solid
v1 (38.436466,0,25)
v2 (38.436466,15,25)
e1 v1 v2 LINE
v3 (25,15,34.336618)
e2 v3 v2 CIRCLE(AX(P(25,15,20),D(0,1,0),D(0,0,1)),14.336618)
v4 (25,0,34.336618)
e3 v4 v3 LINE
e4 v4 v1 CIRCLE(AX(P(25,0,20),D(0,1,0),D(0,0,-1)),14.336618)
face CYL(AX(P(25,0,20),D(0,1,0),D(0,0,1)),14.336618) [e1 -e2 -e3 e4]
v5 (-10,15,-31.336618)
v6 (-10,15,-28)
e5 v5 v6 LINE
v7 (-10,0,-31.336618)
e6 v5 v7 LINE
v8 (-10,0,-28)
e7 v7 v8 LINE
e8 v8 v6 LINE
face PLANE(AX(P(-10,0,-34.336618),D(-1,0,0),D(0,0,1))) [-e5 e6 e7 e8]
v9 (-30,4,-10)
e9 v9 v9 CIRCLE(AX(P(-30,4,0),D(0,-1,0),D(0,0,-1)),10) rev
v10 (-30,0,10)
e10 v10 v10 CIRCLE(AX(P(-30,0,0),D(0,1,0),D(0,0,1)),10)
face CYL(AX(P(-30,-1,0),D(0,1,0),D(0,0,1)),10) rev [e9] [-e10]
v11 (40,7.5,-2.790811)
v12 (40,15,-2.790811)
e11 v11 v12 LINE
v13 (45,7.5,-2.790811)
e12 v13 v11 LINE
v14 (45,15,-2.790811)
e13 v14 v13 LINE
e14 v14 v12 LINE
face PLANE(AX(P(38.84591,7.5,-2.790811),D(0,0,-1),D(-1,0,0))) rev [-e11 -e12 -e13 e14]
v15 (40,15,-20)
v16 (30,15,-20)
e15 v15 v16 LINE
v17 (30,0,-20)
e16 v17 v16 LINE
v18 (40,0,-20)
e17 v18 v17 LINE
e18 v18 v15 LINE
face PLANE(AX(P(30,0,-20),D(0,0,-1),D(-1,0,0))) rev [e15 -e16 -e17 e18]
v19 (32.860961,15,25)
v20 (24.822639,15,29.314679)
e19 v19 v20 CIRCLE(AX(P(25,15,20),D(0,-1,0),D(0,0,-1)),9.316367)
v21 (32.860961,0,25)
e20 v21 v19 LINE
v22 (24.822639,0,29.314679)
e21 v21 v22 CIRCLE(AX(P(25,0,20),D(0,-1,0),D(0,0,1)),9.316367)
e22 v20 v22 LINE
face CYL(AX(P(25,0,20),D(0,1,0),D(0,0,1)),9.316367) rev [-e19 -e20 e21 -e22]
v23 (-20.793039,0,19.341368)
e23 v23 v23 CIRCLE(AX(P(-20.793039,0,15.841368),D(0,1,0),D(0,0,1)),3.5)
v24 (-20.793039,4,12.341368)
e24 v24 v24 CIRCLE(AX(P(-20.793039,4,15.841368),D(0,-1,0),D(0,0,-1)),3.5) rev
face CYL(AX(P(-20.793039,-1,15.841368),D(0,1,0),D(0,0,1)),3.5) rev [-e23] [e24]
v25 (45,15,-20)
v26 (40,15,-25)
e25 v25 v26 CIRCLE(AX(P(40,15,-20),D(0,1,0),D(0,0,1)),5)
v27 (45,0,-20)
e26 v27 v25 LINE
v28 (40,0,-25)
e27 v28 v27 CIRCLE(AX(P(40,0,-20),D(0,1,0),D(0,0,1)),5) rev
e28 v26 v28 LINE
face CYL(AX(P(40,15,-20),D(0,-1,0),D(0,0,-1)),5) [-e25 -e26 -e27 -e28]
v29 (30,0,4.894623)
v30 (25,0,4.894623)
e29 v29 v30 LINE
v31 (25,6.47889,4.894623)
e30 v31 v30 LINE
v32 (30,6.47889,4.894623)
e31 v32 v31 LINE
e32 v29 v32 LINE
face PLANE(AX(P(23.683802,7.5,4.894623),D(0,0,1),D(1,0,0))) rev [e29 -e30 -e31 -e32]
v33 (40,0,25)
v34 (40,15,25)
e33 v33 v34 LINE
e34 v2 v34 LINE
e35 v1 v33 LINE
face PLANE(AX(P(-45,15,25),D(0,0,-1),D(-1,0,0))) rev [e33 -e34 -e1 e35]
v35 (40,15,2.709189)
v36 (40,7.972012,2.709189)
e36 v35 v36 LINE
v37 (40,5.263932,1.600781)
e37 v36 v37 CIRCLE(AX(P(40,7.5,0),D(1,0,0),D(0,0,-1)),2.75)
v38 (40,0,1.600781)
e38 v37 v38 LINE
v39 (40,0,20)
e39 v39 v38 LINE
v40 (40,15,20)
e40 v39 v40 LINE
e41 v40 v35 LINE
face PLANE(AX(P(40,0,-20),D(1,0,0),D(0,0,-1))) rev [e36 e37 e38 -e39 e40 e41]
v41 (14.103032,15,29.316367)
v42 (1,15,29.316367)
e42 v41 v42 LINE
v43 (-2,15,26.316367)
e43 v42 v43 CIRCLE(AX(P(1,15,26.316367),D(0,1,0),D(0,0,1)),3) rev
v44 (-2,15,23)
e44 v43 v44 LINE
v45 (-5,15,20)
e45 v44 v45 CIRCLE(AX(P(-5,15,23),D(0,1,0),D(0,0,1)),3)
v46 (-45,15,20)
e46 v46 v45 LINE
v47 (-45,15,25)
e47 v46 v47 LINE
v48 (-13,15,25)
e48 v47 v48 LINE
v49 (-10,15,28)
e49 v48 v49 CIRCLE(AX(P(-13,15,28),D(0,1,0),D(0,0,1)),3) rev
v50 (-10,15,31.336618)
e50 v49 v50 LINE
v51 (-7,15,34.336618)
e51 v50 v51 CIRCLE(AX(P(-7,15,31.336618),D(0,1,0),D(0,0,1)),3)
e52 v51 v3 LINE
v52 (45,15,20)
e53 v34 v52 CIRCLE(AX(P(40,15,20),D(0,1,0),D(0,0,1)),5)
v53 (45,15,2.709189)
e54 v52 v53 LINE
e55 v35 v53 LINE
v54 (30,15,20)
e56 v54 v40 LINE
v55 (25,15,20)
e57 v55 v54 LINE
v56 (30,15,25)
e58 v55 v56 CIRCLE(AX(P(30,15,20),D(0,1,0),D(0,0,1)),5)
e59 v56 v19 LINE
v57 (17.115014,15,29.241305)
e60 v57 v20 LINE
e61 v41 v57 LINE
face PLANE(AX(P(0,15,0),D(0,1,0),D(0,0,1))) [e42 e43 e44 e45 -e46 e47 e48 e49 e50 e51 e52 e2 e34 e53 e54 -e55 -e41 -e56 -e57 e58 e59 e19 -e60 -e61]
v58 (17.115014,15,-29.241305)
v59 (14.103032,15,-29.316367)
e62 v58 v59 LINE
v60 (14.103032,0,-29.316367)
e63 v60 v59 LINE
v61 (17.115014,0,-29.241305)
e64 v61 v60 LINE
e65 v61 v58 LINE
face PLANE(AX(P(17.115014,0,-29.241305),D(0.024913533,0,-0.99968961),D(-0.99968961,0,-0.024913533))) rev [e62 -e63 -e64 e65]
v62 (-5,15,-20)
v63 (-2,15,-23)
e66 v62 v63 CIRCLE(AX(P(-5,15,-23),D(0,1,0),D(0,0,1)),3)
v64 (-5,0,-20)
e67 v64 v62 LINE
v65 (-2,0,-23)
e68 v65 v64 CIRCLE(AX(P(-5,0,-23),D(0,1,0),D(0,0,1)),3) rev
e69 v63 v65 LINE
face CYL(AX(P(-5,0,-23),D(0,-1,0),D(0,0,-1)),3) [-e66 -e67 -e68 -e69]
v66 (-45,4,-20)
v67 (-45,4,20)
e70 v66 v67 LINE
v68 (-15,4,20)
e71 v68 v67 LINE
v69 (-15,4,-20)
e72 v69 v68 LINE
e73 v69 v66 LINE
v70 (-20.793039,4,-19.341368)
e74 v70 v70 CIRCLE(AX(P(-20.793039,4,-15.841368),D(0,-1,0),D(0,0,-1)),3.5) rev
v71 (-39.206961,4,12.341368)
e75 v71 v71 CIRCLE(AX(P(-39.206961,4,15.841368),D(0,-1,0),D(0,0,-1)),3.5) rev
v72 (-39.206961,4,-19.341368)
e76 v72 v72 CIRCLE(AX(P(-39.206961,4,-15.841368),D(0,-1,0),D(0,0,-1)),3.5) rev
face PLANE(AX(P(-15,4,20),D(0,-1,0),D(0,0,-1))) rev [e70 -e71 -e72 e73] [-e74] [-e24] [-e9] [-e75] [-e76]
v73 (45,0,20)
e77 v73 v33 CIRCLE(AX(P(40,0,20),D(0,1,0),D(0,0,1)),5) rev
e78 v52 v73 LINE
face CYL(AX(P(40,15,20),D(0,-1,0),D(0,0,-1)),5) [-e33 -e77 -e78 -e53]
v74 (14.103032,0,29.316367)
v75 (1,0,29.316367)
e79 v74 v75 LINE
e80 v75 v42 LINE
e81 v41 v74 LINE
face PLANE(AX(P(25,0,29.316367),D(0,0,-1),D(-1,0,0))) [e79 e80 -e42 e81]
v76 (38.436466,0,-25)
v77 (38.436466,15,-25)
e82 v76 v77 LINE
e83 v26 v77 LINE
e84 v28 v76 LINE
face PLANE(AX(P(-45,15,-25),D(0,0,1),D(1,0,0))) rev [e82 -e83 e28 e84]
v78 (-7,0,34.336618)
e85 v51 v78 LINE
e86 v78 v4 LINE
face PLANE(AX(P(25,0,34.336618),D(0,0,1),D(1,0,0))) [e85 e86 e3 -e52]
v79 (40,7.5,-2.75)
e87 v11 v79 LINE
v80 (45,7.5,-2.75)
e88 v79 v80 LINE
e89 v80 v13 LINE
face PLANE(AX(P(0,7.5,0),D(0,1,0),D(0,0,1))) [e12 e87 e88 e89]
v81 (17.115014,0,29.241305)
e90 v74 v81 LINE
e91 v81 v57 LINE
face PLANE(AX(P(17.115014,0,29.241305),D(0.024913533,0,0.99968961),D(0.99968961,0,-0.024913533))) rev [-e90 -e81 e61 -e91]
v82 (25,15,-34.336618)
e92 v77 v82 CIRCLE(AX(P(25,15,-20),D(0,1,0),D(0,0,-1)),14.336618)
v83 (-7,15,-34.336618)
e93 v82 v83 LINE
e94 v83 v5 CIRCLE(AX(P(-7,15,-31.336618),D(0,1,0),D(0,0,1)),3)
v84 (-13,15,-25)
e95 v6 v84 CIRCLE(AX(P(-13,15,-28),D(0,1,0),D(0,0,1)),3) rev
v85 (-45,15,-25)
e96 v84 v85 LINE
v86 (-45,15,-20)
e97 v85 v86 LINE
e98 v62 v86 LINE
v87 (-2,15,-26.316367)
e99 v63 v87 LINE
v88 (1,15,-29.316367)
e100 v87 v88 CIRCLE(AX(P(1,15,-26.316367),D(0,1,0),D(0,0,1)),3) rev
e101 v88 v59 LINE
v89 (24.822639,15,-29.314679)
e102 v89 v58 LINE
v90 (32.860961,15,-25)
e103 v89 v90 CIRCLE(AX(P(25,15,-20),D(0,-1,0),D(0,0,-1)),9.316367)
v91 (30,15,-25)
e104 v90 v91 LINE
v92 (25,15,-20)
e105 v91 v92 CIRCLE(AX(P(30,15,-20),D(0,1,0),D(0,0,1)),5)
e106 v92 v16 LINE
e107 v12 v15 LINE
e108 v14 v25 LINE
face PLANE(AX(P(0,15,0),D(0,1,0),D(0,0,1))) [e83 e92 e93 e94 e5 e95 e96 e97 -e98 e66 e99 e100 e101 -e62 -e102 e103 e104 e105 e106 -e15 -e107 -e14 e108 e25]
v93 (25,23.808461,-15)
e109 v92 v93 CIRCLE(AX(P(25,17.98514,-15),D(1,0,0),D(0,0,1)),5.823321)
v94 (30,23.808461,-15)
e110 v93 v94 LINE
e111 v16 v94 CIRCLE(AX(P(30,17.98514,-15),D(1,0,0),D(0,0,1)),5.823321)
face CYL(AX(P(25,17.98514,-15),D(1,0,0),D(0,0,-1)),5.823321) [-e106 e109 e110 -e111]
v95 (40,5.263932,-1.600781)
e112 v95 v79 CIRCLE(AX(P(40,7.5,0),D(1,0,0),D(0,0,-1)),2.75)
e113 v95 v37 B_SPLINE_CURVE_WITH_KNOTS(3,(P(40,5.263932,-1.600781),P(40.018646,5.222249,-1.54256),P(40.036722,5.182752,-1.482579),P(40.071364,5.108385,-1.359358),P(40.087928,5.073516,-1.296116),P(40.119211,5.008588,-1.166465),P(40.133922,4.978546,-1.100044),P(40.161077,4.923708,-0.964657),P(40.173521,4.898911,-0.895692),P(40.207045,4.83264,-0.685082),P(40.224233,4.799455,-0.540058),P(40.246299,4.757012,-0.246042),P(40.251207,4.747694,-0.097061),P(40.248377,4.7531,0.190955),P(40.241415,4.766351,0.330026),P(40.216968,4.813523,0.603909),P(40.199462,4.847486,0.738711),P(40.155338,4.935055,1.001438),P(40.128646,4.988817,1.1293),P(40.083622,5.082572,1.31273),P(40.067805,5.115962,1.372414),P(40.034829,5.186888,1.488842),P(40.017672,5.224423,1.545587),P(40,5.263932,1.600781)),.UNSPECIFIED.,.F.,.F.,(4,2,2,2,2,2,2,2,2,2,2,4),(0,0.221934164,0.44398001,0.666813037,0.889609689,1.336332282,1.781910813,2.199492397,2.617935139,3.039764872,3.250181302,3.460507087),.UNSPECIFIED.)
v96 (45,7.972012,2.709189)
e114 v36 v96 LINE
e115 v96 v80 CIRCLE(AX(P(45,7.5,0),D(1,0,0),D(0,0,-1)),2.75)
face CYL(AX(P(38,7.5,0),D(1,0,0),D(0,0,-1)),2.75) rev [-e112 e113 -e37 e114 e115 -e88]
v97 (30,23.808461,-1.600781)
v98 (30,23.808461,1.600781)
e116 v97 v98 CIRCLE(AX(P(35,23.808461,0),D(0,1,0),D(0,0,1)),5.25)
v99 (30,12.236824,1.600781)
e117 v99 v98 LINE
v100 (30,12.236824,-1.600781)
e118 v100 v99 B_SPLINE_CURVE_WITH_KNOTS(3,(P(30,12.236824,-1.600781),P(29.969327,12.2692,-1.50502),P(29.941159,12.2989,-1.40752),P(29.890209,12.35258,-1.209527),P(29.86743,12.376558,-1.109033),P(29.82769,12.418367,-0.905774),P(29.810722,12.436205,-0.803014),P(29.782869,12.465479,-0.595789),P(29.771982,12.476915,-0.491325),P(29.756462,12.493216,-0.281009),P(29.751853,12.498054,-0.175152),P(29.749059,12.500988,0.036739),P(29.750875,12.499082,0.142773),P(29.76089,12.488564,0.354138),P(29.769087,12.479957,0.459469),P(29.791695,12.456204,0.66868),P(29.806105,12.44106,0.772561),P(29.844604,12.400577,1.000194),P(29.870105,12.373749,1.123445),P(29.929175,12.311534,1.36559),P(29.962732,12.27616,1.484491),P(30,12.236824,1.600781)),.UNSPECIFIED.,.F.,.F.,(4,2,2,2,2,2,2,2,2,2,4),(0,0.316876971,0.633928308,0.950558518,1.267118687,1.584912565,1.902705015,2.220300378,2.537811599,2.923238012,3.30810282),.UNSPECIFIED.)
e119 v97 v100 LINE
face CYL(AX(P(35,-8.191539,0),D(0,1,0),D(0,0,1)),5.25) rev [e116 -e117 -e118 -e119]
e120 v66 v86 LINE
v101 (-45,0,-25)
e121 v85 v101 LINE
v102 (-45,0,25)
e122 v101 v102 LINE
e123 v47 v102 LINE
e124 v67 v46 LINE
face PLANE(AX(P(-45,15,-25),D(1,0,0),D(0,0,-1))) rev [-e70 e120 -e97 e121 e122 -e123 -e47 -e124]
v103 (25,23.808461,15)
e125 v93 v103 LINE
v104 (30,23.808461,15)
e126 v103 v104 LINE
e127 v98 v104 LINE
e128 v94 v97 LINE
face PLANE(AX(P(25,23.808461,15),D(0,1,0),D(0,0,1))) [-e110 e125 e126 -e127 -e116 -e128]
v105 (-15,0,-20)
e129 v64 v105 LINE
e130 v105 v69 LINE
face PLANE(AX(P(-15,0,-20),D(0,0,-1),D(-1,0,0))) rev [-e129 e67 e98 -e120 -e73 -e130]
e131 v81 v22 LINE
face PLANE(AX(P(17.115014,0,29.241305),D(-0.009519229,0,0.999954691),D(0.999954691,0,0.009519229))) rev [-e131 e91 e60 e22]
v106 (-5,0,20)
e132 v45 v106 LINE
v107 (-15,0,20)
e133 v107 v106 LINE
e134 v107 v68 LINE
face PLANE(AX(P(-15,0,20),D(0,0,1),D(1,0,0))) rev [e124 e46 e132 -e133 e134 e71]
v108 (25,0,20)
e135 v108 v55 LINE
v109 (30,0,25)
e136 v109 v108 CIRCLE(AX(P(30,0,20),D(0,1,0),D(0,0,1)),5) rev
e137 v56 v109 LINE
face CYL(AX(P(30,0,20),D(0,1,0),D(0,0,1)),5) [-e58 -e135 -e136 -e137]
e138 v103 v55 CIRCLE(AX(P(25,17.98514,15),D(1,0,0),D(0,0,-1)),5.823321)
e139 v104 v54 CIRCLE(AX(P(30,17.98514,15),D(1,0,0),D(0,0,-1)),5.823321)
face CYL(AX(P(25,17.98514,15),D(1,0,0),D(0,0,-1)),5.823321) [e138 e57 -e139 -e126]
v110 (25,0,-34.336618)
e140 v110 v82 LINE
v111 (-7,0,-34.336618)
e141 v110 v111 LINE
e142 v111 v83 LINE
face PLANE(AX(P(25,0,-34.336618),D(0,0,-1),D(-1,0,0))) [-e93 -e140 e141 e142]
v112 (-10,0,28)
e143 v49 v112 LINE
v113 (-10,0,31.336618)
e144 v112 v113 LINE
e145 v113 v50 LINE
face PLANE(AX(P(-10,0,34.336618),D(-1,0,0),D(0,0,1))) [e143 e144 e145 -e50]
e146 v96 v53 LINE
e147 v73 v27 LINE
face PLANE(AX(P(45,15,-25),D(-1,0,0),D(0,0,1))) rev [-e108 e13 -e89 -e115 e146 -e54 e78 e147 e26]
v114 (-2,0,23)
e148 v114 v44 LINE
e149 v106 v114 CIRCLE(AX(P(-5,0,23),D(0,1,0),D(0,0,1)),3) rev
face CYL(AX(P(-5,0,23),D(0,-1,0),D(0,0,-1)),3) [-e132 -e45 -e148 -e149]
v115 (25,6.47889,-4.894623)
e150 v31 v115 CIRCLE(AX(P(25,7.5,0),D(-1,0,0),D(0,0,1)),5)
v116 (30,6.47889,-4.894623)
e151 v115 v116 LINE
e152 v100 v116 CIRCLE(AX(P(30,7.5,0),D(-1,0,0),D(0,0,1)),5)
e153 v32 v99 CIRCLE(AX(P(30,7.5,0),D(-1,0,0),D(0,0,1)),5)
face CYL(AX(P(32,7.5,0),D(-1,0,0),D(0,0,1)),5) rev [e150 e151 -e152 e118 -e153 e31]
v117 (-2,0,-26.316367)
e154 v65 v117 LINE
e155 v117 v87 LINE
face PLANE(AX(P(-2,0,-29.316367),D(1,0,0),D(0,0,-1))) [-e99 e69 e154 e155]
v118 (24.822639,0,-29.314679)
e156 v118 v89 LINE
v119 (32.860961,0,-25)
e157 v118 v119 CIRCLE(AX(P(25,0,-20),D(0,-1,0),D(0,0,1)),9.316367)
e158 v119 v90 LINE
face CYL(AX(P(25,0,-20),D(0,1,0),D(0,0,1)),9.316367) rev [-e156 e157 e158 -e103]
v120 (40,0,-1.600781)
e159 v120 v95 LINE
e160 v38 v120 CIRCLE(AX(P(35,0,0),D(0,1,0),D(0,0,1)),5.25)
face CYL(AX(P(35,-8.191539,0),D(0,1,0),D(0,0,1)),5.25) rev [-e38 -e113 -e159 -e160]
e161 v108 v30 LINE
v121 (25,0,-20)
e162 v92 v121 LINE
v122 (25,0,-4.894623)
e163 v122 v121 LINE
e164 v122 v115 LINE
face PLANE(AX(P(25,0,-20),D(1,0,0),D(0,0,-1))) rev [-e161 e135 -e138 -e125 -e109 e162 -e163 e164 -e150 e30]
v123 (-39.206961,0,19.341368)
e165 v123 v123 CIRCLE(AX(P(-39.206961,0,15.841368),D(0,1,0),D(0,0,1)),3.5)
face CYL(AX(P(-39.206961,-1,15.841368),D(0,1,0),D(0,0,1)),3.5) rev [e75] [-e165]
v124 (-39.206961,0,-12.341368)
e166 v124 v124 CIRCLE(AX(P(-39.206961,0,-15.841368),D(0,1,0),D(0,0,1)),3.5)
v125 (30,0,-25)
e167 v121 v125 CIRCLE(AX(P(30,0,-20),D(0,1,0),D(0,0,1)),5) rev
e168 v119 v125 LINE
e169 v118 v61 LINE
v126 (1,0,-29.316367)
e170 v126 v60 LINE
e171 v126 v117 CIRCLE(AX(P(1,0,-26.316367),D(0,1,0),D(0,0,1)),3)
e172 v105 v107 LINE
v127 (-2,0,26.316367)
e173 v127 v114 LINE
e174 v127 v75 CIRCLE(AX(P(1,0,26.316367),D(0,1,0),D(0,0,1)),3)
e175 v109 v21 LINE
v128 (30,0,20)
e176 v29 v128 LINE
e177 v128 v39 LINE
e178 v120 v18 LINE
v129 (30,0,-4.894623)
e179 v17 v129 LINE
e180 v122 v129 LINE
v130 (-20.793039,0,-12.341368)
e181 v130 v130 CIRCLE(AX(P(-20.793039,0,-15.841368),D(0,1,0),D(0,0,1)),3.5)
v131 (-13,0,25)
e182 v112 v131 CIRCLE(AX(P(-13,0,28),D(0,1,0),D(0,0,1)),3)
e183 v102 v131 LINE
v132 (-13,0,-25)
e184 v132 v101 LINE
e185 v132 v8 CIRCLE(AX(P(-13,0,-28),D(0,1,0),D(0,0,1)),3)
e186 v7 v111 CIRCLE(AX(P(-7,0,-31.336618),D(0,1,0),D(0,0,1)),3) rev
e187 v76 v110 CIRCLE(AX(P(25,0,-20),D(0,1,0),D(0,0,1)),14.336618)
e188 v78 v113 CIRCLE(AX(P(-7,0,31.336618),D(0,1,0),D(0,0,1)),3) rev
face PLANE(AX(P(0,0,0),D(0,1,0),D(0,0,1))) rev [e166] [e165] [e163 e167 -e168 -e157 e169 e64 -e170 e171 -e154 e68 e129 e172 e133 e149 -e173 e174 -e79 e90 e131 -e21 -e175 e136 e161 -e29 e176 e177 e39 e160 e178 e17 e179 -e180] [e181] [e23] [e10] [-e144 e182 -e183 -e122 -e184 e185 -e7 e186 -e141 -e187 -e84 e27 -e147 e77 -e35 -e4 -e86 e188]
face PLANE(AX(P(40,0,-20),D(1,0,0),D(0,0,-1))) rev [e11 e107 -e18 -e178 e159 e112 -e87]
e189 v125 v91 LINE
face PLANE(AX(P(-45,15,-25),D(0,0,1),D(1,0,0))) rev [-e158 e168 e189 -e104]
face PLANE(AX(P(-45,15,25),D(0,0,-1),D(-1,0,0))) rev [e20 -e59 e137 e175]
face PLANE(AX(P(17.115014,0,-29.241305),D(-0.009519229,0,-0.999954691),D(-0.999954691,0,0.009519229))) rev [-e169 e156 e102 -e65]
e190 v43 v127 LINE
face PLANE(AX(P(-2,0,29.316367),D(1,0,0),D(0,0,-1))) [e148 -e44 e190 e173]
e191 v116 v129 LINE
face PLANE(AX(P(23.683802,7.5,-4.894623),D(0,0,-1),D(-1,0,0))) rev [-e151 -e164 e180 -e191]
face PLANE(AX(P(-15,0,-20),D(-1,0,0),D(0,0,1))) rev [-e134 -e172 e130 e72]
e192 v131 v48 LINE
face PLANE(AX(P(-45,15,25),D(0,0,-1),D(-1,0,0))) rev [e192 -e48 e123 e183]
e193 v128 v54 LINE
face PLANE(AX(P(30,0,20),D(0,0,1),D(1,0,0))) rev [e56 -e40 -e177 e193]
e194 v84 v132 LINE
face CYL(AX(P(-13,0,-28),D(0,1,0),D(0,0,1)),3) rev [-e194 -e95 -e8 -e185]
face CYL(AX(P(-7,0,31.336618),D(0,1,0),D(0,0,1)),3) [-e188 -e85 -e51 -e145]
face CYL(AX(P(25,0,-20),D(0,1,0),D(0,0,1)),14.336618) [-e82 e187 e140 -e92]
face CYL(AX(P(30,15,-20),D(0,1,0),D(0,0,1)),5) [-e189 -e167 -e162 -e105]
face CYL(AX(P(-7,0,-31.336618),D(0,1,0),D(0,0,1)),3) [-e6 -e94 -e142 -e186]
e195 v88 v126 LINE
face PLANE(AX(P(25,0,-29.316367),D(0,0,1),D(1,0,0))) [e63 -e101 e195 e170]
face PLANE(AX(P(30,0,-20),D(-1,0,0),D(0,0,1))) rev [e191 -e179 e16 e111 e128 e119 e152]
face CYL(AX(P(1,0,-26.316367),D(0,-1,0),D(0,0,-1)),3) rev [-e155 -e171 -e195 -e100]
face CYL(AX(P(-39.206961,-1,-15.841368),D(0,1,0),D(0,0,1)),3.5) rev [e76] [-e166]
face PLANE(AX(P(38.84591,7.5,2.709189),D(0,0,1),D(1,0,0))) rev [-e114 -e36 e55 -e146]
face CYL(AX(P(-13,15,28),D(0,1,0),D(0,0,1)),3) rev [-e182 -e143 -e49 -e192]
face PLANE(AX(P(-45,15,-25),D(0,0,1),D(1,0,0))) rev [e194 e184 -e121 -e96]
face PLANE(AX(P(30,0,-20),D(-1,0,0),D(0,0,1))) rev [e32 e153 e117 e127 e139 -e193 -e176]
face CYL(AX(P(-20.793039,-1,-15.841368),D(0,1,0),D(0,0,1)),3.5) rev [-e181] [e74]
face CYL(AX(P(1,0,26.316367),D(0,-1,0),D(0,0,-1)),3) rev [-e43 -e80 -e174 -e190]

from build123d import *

# Parameters (mm, degrees)
SKETCH1_W           = 90
SKETCH1_H           = 50
BOSS_EXTRUDE1_DEPTH = 15
SKETCH2_W           = 40
SKETCH2_H           = 40
SKETCH2_W_2         = 10
CUT_EXTRUDE1_DEPTH  = 15
SKETCH6_R           = 2.75
CUT_EXTRUDE4_DEPTH  = 7
SKETCH8_R           = 5
CUT_EXTRUDE5_DEPTH  = 7
BOSS_EXTRUDE2_DEPTH = 15
SKETCH11_W          = 7.860960604
SKETCH11_H          = 5
CUT_EXTRUDE7_DEPTH  = 15
FILLET1_R           = 5
FILLET2_R           = 5
FILLET3_R           = 5
FILLET4_R           = 5
FILLET5_R           = 5
SKETCH12_W          = 6.801796193
SKETCH12_H          = 5.5
CUT_EXTRUDE8_DEPTH  = 7.5
SKETCH13_W          = 7.647159446
SKETCH13_H          = 9.789246186
CUT_EXTRUDE9_DEPTH  = 7.5
BOSS_EXTRUDE4_DEPTH = 5
SKETCH16_W          = 30
SKETCH16_H          = 40
CUT_EXTRUDE10_DEPTH = 5
SKETCH18_R          = 10
SKETCH18_R_2        = 3.5
CUT_EXTRUDE12_DEPTH = 11
SKETCH17_R          = 5.25
CUT_EXTRUDE13_DEPTH = 32
BOSS_EXTRUDE5_DEPTH = 15
CUT_EXTRUDE14_DEPTH = 15
FILLET7_R           = 3
SKETCH21_W          = 40
SKETCH21_H          = 6
CUT_EXTRUDE15_DEPTH = 30


with BuildPart() as part:
    # Sketch1 → Boss-Extrude1 (new body)
    with BuildSketch(Plane(origin=(0, 0, 0), x_dir=(1, 0, 0), z_dir=(0, 1, 0))):
        Rectangle(SKETCH1_W, SKETCH1_H)
    extrude(amount=BOSS_EXTRUDE1_DEPTH)

    # Sketch2 → Cut-Extrude1 (cut)
    with BuildSketch(Plane(origin=(0, 15, 0), x_dir=(1, 0, 0), z_dir=(0, 1, 0))):
        with Locations((5, 0)):
            Rectangle(SKETCH2_W, SKETCH2_H)
        with Locations((35, 0)):
            Rectangle(SKETCH2_W_2, SKETCH2_H)
    extrude(amount=-CUT_EXTRUDE1_DEPTH, mode=Mode.SUBTRACT)

    # Sketch6 → Cut-Extrude4 (cut)
    with BuildSketch(Plane(origin=(45, 0, 0), x_dir=(0, 0, -1), z_dir=(1, 0, 0))):
        with Locations((0, 7.5)):
            Circle(SKETCH6_R)
    extrude(amount=-CUT_EXTRUDE4_DEPTH, mode=Mode.SUBTRACT)

    # Sketch8 → Cut-Extrude5 (cut)
    with BuildSketch(Plane.ZY.offset(-25)):
        with Locations((0, 7.5)):
            Circle(SKETCH8_R)
    extrude(amount=-CUT_EXTRUDE5_DEPTH, mode=Mode.SUBTRACT)

    # Sketch10 → Boss-Extrude2 (add)
    with BuildSketch(Plane(origin=(0, 15, 0), x_dir=(1, 0, 0), z_dir=(0, 1, 0))):
        with BuildLine():
            Line((11.563534407, 25), (17.139039396, 25))
            ThreePointArc((17.139039396, 25), (20.515980342, 28.166288589), (25, 29.316367404))
            ThreePointArc((25, 29.316367404), (29.484019658, 28.166288589), (32.860960604, 25))
            Line((32.860960604, 25), (38.436465593, 25))
            ThreePointArc((38.436465593, 25), (33.180938792, 31.773310839), (25, 34.336617719))
            ThreePointArc((25, 34.336617719), (16.819061208, 31.773310839), (11.563534407, 25))
        make_face()
        with BuildLine():
            Line((11.563534407, -25), (17.139039396, -25))
            ThreePointArc((17.139039396, -25), (20.515980342, -28.166288589), (25, -29.316367404))
            ThreePointArc((25, -29.316367404), (29.484019658, -28.166288589), (32.860960604, -25))
            Line((32.860960604, -25), (38.436465593, -25))
            ThreePointArc((38.436465593, -25), (33.180938792, -31.773310839), (25, -34.336617719))
            ThreePointArc((25, -34.336617719), (16.819061208, -31.773310839), (11.563534407, -25))
        make_face()
    extrude(amount=-BOSS_EXTRUDE2_DEPTH)

    # Sketch11 → Cut-Extrude7 (cut)
    with BuildSketch(Plane(origin=(0, 15, 0), x_dir=(1, 0, 0), z_dir=(0, 1, 0))):
        with Locations((21.069519698, 22.5)):
            Rectangle(SKETCH11_W, SKETCH11_H)
        with Locations((21.069519698, -22.5)):
            Rectangle(SKETCH11_W, SKETCH11_H)
    extrude(amount=-CUT_EXTRUDE7_DEPTH, mode=Mode.SUBTRACT)

    # Fillet1
    fillet1_edges = [part.edges().sort_by_distance(p)[0] for p in [
        (25, 7.5, 25),
        (25, 7.5, -25),
    ]]
    fillet(fillet1_edges, radius=FILLET1_R)

    # Fillet2
    fillet2_edges = [part.edges().sort_by_distance(p)[0] for p in [
        (17.139039396, 7.5, 20),
        (17.139039396, 7.5, -20),
    ]]
    fillet(fillet2_edges, radius=FILLET2_R - 0.0001)  # a hair under: the kernel refuses the full size

    # Fillet3
    fillet3_edges = [part.edges().sort_by_distance(p)[0] for p in [
        (17.139039396, 7.5, -25),
        (17.139039396, 7.5, 25),
    ]]
    fillet(fillet3_edges, radius=FILLET3_R)

    # Fillet4
    fillet4_edges = [part.edges().sort_by_distance(p)[0] for p in [
        (45, 7.5, 25),
        (45, 7.5, -25),
    ]]
    fillet(fillet4_edges, radius=FILLET4_R)

    # Fillet5
    fillet5_edges = [part.edges().sort_by_distance(p)[0] for p in [
        (11.563534407, 7.5, -25),
        (11.563534407, 7.5, 25),
    ]]
    fillet(fillet5_edges, radius=FILLET5_R)

    # Sketch12 → Cut-Extrude8 (cut)
    with BuildSketch(Plane(origin=(0, 15, 0), x_dir=(1, 0, 0), z_dir=(0, 1, 0))):
        with Locations((42.246807925, 0.040811044)):
            Rectangle(SKETCH12_W, SKETCH12_H)
    extrude(amount=-CUT_EXTRUDE8_DEPTH, mode=Mode.SUBTRACT)

    # Sketch13 → Cut-Extrude9 (cut)
    with BuildSketch(Plane.XZ):
        with Locations((27.507381734, 0)):
            Rectangle(SKETCH13_W, SKETCH13_H)
    extrude(amount=-CUT_EXTRUDE9_DEPTH, mode=Mode.SUBTRACT)

    # Sketch15 → Boss-Extrude4 (add)
    with BuildSketch(Plane(origin=(30, 0, 0), x_dir=(0, 0, -1), z_dir=(1, 0, 0))):
        with BuildLine():
            Line((-15, 23.80846108), (15, 23.80846108))
            ThreePointArc((15, 23.80846108), (20.064311074, 20.859825933), (20, 15))
            Line((20, 15), (-20, 15))
            ThreePointArc((-20, 15), (-20.064311074, 20.859825933), (-15, 23.80846108))
        make_face()
    extrude(amount=-BOSS_EXTRUDE4_DEPTH)

    # Sketch16 → Cut-Extrude10 (cut)
    with BuildSketch(Plane(origin=(0, 15, 0), x_dir=(1, 0, 0), z_dir=(0, 1, 0))):
        with Locations((-30, 0)):
            Rectangle(SKETCH16_W, SKETCH16_H)
    extrude(amount=-CUT_EXTRUDE10_DEPTH, mode=Mode.SUBTRACT)

    # Sketch18 → Cut-Extrude12 (cut)
    with BuildSketch(Plane(origin=(0, 10, 0), x_dir=(1, 0, 0), z_dir=(0, 1, 0))):
        with Locations(Location((-30, 0, 0), (0, 0, 270))):
            Circle(SKETCH18_R)
        with Locations(Location((-39.206960866, 15.841368379, 0), (0, 0, 270))):
            Circle(SKETCH18_R_2)
        with Locations(Location((-20.793039134, 15.841368379, 0), (0, 0, 270))):
            Circle(SKETCH18_R_2)
        with Locations(Location((-20.793039134, -15.841368379, 0), (0, 0, 270))):
            Circle(SKETCH18_R_2)
        with Locations(Location((-39.206960866, -15.841368379, 0), (0, 0, 270))):
            Circle(SKETCH18_R_2)
    extrude(amount=-CUT_EXTRUDE12_DEPTH, mode=Mode.SUBTRACT)

    # Sketch17 → Cut-Extrude13 (cut)
    with BuildSketch(Plane(origin=(0, 23.80846108, 0), x_dir=(1, 0, 0), z_dir=(0, 1, 0))):
        with Locations((35, 0)):
            Circle(SKETCH17_R)
    extrude(amount=-CUT_EXTRUDE13_DEPTH, mode=Mode.SUBTRACT)

    # Sketch19 → Boss-Extrude5 (add)
    with BuildSketch(Plane(origin=(0, 15, 0), x_dir=(1, 0, 0), z_dir=(0, 1, 0))):
        Polygon((25, 34.336617719), (-10, 34.336617719), (-10, 25), (-2, 25), (-2, 29.316367404), (25, 29.316367404), align=None)
        Polygon((-2, -29.316367404), (-2, -25), (-10, -25), (-10, -34.336617719), (25, -34.336617719), (25, -29.316367404), align=None)
    extrude(amount=-BOSS_EXTRUDE5_DEPTH)

    # Sketch20 → Cut-Extrude14 (cut)
    with BuildSketch(Plane(origin=(0, 15, 0), x_dir=(1, 0, 0), z_dir=(0, 1, 0))):
        Polygon((-2, -25), (-2, -20), (17.115013572, -20), (25, -29.316367404), (17.115013572, -29.241305009), (14.103032256, -29.316367404), align=None)
        Polygon((17.115013572, 29.241305009), (14.103032256, 29.316367404), (-2, 25), (-2, 20), (17.115013572, 20), (25, 29.316367404), align=None)
    extrude(amount=-CUT_EXTRUDE14_DEPTH, mode=Mode.SUBTRACT)

    # Fillet7
    fillet7_edges = [part.edges().sort_by_distance(p)[0] for p in [
        (-2, 7.5, -29.316367404),
        (-10, 7.5, -25),
        (-10, 7.5, -34.336617719),
        (-2, 7.5, 29.316367404),
        (-10, 7.5, 34.336617719),
        (-10, 7.5, 25),
        (-2, 7.5, 20),
        (-2, 7.5, -20),
    ]]
    fillet(fillet7_edges, radius=FILLET7_R)

    # Sketch21 → Cut-Extrude15 (cut)
    with BuildSketch(Plane.ZY.offset(45)):
        with Locations((0, 7)):
            Rectangle(SKETCH21_W, SKETCH21_H)
    extrude(amount=-CUT_EXTRUDE15_DEPTH, mode=Mode.SUBTRACT)


solid = part.part
